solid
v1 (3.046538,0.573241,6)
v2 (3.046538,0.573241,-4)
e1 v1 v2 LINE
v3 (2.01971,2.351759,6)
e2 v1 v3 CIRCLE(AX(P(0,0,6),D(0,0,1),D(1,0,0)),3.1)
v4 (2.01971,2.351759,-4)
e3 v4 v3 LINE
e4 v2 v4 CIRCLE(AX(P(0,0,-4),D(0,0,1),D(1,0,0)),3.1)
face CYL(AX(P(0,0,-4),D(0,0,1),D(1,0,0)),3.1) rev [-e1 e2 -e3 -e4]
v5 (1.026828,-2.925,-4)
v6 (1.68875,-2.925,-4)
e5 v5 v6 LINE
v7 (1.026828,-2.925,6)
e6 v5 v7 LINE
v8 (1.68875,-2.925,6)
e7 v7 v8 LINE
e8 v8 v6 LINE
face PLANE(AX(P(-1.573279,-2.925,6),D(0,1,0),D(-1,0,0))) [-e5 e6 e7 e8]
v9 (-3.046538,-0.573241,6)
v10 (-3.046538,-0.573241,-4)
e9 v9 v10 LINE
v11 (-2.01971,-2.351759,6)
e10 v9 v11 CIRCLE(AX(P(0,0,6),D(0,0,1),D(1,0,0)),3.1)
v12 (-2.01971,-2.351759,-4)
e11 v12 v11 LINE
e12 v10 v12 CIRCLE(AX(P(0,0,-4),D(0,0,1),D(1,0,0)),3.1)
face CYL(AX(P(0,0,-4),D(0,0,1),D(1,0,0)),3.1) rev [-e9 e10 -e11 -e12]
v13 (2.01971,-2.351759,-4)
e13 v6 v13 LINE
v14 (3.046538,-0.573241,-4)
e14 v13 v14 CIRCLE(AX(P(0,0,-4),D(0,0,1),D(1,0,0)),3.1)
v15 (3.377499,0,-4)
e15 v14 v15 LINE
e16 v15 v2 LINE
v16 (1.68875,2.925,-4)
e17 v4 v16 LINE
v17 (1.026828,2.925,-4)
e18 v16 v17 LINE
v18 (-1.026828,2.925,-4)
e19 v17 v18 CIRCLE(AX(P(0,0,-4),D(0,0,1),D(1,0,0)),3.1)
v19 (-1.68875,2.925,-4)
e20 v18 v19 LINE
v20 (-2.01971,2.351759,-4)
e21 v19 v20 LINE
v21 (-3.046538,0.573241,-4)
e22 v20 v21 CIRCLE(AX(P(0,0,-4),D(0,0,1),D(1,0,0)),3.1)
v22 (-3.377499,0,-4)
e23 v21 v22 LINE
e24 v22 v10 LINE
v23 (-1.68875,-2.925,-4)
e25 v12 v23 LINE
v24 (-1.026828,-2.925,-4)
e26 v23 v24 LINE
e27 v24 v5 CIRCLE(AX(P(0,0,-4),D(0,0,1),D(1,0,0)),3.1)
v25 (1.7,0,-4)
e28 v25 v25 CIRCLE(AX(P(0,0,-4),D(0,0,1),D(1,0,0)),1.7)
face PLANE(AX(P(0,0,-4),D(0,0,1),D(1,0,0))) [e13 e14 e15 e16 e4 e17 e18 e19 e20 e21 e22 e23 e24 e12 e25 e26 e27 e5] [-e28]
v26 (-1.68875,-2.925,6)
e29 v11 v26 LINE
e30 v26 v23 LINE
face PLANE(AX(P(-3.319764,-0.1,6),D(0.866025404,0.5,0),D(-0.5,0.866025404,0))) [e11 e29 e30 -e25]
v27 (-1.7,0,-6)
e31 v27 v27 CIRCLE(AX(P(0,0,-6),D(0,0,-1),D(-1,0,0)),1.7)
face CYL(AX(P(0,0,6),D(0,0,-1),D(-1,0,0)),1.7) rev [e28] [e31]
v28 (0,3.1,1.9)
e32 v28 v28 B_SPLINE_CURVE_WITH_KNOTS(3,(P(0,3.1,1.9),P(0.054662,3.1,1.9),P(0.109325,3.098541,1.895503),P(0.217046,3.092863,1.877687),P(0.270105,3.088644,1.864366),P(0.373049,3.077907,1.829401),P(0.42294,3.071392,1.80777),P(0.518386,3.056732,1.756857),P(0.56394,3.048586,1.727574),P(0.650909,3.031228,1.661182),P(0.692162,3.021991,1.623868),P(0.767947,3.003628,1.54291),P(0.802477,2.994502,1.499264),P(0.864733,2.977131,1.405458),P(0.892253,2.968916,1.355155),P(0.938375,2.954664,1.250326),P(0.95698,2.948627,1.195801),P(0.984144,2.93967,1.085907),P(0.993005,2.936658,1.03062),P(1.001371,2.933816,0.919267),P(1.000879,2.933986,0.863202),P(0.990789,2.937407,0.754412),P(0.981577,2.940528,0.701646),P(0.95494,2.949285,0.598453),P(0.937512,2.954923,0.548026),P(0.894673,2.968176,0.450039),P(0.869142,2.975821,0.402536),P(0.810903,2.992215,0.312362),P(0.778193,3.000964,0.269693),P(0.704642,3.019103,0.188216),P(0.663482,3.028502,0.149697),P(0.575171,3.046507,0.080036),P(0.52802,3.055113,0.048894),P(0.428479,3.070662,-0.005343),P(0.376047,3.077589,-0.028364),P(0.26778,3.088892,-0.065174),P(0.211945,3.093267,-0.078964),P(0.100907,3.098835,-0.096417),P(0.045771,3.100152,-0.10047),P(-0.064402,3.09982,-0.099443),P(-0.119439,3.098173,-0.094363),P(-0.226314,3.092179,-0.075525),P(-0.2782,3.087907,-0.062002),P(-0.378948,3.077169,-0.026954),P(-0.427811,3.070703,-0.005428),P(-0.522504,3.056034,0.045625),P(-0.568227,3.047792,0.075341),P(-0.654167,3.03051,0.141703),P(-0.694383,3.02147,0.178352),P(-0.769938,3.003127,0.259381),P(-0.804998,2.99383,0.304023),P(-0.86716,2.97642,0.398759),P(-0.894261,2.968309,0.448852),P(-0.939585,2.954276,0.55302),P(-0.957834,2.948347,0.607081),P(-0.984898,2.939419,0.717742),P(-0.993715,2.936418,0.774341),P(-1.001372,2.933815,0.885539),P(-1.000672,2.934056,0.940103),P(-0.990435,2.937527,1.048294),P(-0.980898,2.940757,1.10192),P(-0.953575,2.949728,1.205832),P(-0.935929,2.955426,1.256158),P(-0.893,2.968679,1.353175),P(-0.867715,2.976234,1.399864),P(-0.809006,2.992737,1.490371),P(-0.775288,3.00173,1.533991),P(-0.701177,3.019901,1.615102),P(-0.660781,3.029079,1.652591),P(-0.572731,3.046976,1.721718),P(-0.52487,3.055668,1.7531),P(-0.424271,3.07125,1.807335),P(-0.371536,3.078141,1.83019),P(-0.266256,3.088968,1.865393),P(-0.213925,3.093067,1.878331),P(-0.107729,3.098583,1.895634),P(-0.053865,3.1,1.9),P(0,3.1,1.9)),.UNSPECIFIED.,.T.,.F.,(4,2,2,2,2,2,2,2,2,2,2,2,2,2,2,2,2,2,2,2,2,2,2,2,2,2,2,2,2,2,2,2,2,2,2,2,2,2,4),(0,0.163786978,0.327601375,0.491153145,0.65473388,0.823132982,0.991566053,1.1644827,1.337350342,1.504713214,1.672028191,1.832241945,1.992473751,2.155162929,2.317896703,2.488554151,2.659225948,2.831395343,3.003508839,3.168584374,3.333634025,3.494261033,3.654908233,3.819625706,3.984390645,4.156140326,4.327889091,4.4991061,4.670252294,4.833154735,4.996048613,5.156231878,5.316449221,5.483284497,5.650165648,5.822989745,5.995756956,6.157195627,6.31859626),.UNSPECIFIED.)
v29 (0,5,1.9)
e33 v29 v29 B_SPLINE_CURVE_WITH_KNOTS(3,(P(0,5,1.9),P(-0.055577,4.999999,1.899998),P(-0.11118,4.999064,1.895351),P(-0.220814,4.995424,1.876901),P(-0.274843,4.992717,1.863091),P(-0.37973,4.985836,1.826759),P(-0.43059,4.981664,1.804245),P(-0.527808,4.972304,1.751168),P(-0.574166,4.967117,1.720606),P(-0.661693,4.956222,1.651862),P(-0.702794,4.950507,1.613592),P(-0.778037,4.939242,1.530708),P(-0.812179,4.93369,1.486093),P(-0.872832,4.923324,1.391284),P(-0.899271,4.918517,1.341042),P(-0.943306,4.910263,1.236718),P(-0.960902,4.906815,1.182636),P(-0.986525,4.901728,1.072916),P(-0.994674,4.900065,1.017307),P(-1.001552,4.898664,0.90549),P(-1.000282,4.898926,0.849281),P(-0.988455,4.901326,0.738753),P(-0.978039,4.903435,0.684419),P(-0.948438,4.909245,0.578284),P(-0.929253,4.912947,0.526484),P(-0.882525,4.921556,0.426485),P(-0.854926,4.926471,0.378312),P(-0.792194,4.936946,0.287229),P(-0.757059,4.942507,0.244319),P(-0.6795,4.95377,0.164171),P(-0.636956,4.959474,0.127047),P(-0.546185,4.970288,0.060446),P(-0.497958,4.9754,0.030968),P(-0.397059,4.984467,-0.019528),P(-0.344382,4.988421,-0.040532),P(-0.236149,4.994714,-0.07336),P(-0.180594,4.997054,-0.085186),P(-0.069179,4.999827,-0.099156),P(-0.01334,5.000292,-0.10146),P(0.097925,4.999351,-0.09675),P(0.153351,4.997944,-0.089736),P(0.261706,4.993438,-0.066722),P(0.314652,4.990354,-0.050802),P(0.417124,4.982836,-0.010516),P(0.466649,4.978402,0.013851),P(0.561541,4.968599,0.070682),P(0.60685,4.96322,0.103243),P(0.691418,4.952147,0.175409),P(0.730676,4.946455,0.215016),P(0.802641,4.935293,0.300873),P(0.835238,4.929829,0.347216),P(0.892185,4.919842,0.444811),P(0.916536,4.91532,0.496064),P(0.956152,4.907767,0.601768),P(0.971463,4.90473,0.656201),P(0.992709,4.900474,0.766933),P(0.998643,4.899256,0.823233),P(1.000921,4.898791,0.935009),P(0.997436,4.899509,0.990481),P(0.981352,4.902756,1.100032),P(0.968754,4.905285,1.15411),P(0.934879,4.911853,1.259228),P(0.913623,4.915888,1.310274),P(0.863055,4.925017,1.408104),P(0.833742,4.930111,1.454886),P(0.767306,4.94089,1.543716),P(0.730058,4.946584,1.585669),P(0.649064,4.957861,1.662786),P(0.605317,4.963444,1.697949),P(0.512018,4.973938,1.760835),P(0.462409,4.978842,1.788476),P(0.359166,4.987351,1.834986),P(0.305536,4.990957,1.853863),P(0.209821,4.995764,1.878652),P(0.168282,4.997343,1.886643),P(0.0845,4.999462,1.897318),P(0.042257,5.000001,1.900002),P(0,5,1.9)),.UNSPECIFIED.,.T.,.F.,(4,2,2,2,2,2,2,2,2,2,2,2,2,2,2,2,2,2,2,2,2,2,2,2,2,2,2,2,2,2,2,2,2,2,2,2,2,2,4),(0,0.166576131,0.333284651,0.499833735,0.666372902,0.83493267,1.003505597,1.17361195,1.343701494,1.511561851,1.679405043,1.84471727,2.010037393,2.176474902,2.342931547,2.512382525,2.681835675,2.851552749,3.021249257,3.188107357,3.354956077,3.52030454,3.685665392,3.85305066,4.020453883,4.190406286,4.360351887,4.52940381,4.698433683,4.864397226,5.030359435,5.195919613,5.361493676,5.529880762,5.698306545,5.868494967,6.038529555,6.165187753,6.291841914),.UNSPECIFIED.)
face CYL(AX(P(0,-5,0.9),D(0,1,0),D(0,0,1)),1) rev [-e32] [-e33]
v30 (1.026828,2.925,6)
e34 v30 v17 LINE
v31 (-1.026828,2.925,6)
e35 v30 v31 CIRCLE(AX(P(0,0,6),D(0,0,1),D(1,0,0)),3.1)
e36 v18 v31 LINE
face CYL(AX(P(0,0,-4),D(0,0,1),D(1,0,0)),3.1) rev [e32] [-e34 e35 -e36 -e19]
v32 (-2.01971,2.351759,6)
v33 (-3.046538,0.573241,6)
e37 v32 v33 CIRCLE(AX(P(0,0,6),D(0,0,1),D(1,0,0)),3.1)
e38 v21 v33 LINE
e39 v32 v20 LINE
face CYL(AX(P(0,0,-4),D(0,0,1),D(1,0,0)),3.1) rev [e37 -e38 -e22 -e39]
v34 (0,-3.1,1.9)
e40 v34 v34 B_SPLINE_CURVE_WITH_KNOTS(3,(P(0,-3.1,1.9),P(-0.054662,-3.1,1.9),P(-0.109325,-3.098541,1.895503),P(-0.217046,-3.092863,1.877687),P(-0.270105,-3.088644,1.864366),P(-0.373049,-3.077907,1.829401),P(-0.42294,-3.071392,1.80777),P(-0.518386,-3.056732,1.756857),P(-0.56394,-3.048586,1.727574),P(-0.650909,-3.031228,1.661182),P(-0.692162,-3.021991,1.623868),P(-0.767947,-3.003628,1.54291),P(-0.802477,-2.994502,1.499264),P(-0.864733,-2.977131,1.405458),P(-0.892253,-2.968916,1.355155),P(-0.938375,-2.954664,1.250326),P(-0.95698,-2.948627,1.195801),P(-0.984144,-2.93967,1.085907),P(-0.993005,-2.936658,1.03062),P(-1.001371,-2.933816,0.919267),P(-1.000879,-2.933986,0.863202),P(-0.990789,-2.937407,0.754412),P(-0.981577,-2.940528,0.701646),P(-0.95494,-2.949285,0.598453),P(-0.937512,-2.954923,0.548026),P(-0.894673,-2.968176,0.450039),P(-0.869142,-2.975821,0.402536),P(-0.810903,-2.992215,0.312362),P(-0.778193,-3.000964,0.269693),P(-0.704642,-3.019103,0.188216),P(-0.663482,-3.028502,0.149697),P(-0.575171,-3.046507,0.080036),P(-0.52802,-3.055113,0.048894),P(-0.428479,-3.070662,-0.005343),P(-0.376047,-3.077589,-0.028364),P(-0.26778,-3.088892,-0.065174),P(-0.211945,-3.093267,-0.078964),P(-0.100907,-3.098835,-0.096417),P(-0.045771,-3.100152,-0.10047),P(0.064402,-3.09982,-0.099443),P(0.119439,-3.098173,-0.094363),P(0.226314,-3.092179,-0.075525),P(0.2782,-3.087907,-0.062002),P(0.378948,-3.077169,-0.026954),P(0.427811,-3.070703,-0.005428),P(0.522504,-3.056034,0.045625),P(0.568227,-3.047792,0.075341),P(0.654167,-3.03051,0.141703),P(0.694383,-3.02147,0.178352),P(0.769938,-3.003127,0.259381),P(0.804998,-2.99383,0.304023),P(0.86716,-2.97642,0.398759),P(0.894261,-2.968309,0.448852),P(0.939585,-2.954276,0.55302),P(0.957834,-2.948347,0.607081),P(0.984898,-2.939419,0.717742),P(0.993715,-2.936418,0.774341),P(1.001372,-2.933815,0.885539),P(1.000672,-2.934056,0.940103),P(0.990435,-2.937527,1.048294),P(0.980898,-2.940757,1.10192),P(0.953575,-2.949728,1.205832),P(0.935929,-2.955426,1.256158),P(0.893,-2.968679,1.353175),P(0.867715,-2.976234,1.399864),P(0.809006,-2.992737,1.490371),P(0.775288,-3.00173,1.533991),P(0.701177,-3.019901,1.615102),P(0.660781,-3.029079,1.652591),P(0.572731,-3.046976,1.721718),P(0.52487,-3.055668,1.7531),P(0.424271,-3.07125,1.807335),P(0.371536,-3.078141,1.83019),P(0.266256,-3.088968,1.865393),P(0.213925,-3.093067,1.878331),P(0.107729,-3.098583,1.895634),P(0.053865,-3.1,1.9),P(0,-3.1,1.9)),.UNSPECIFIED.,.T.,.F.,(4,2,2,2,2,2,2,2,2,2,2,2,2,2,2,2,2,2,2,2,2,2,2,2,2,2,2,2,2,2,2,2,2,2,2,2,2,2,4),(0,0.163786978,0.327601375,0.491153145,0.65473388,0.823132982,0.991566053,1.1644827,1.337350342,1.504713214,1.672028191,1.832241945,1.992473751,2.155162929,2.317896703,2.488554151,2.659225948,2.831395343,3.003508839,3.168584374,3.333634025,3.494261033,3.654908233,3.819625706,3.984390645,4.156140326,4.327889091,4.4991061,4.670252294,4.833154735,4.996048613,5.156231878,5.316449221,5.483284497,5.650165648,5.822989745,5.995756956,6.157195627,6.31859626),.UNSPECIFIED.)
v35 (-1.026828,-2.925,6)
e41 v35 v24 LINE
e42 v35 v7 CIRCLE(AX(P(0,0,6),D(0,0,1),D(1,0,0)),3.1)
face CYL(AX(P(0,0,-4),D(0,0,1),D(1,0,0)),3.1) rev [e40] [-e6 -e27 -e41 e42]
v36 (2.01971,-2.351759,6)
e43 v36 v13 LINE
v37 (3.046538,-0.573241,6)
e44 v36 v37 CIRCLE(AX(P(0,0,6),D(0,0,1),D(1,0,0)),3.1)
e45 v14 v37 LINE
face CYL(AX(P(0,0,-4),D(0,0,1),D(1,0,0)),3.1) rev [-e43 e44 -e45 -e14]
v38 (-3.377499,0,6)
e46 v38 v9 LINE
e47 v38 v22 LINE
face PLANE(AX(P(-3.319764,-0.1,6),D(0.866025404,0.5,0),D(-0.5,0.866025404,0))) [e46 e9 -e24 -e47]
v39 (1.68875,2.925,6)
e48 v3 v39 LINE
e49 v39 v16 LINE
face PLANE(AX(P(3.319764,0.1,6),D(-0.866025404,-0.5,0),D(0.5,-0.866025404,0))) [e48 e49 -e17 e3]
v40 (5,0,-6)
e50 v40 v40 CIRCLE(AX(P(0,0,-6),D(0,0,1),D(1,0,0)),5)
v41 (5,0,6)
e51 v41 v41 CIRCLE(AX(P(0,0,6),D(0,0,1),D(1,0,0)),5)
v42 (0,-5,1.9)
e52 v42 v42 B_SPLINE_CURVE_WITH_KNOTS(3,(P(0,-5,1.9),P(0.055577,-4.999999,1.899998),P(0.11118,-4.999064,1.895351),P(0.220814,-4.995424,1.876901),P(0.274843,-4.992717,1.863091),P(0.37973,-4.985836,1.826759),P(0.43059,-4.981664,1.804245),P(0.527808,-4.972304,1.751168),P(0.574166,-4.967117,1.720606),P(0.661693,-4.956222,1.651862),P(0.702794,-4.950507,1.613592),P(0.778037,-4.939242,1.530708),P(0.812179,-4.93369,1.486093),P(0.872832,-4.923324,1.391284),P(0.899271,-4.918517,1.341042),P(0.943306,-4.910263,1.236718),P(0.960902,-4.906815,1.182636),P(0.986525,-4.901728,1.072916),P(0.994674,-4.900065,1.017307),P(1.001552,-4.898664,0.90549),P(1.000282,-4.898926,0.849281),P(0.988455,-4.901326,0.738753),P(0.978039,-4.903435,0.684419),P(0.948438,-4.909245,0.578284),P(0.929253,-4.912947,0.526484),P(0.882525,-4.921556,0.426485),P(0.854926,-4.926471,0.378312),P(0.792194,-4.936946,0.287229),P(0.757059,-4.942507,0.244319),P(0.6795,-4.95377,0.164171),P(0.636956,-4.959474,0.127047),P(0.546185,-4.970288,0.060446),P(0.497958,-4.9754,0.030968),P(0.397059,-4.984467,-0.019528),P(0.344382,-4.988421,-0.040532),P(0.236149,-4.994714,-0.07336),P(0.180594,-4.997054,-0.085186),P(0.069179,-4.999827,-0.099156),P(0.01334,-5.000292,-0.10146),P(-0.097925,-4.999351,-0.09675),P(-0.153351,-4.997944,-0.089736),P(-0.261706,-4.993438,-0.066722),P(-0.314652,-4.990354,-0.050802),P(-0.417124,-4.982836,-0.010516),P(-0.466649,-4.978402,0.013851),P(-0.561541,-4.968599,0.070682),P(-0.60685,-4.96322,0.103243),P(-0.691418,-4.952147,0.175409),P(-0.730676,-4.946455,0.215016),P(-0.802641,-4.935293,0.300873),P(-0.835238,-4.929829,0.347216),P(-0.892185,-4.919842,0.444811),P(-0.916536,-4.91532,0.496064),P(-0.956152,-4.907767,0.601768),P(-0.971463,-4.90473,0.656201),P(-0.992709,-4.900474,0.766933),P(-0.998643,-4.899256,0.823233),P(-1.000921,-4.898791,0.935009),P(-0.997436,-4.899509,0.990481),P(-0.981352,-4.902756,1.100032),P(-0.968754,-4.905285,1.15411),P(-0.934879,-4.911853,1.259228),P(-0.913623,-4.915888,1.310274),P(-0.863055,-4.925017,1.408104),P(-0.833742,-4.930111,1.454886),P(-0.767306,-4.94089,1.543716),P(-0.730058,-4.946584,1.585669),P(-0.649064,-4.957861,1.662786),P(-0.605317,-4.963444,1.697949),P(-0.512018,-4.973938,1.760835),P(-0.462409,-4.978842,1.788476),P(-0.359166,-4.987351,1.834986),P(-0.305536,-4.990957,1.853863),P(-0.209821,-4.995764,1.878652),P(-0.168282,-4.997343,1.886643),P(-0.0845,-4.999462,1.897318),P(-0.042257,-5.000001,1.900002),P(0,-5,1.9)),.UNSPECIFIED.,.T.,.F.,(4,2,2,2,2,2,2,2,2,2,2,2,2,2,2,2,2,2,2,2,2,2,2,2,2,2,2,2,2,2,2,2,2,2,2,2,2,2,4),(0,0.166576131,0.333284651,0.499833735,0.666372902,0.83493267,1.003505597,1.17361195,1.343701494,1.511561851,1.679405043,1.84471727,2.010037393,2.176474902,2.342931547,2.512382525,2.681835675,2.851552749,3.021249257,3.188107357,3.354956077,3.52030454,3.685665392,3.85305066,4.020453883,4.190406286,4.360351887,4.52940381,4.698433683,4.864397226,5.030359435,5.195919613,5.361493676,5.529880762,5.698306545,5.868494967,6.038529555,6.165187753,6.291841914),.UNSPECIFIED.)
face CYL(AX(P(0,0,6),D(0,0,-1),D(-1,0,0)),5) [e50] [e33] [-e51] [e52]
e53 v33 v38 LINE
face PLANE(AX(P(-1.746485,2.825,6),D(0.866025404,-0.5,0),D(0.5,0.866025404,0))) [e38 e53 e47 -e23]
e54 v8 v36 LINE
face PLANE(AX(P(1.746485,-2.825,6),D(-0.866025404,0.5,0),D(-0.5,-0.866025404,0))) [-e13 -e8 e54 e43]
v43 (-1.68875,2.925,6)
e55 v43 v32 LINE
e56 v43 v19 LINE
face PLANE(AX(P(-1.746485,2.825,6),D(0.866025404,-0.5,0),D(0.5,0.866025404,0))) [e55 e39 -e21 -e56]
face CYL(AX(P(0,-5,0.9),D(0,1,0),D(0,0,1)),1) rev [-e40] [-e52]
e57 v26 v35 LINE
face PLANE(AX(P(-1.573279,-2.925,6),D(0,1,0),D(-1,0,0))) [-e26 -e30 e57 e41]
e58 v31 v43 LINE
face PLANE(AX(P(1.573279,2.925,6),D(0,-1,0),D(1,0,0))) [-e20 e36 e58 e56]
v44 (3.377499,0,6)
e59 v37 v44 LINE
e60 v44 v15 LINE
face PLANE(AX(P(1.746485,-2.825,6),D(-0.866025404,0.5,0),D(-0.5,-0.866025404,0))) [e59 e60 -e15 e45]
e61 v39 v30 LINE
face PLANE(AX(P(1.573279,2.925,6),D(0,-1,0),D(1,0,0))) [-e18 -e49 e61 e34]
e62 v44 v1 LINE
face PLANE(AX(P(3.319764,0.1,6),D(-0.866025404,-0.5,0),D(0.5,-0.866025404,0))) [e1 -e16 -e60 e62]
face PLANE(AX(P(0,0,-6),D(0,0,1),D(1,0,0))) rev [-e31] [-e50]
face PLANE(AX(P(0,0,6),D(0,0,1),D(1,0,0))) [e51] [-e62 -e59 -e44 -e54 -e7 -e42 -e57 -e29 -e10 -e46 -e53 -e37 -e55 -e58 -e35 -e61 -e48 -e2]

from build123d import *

# Parameters (mm, degrees)
SKETCH1_R               = 5
BOSS_EXTRUDE1_DEPTH     = 6
SKETCH2_R               = 3
CUT_EXTRUDE1_DEPTH      = 10
CUT_EXTRUDE2_DEPTH      = 13.247448714
MOVE_START              = -4
MOVE_FACE1_DEPTH        = 10
MOVE_FACE2_DEPTH        = 10
SKETCH4_R               = 1.7
CUT_EXTRUDE3_DEPTH      = 14.928388277
CUT_EXTRUDE7_DEPTH      = 10.273618495
CUT_EXTRUDE7_DEPTH_BACK = 10.273618495
SKETCH10_R              = 1


# Read off the part's stored shape, not the designer's step: Move Face1, Move Face2
with BuildPart() as part:
    # Sketch1 → Boss-Extrude1 (new, symmetric)
    with BuildSketch(Plane.XY):
        Circle(SKETCH1_R)
    extrude(amount=BOSS_EXTRUDE1_DEPTH, both=True)

    # Sketch2 → Cut-Extrude1 (cut)
    with BuildSketch(Plane.XY.offset(6)):
        Circle(SKETCH2_R)
    extrude(amount=-CUT_EXTRUDE1_DEPTH, mode=Mode.SUBTRACT)

    # Sketch3 → Cut-Extrude2 (cut, through all)
    with BuildSketch(Plane.XY.offset(-4)):
        Polygon((1.573279484, 2.725), (-1.573279484, 2.725), (-3.146558967, 0), (-1.573279484, -2.725), (1.573279484, -2.725), (3.146558967, 0), align=None)
    extrude(amount=CUT_EXTRUDE2_DEPTH, mode=Mode.SUBTRACT)

    # Move Face1 outline → Move Face1 (cut)
    with BuildSketch(Plane.XY.offset(MOVE_START)):
        with BuildLine():
            Line((2.866431597, -0.885194838), (3.377499075, 0))
            Line((3.377499075, 0), (2.866431597, 0.885194838))
            ThreePointArc((2.866431597, 0.885194838), (2.942674777, 0.583665277), (2.98728973, 0.275862411))
            Line((2.98728973, 0.275862411), (3.146558967, 0))
            Line((3.146558967, 0), (2.98728973, -0.275862411))
            ThreePointArc((2.98728973, -0.275862411), (2.942674777, -0.583665277), (2.866431597, -0.885194838))
        make_face()
        with BuildLine():
            Line((1.688749537, -2.925), (2.199817015, -2.039805162))
            ThreePointArc((2.199817015, -2.039805162), (1.976806346, -2.256598473), (1.732548721, -2.449137589))
            Line((1.732548721, -2.449137589), (1.573279484, -2.725))
            Line((1.573279484, -2.725), (1.254741009, -2.725))
            ThreePointArc((1.254741009, -2.725), (0.965868431, -2.840263751), (0.666614581, -2.925))
            Line((0.666614581, -2.925), (1.688749537, -2.925))
        make_face()
        with BuildLine():
            ThreePointArc((1.732548721, 2.449137589), (1.976806346, 2.256598473), (2.199817015, 2.039805162))
            Line((2.199817015, 2.039805162), (1.688749537, 2.925))
            Line((1.688749537, 2.925), (0.666614581, 2.925))
            ThreePointArc((0.666614581, 2.925), (0.965868431, 2.840263751), (1.254741009, 2.725))
            Line((1.254741009, 2.725), (1.573279484, 2.725))
            Line((1.573279484, 2.725), (1.732548721, 2.449137589))
        make_face()
        with BuildLine():
            Line((-1.688749537, -2.925), (-0.666614581, -2.925))
            ThreePointArc((-0.666614581, -2.925), (-0.965868431, -2.840263751), (-1.254741009, -2.725))
            Line((-1.254741009, -2.725), (-1.573279484, -2.725))
            Line((-1.573279484, -2.725), (-1.732548721, -2.449137589))
            ThreePointArc((-1.732548721, -2.449137589), (-1.976806346, -2.256598473), (-2.199817015, -2.039805162))
            Line((-2.199817015, -2.039805162), (-1.688749537, -2.925))
        make_face()
        with BuildLine():
            ThreePointArc((-1.254741009, 2.725), (-0.965868431, 2.840263751), (-0.666614581, 2.925))
            Line((-0.666614581, 2.925), (-1.688749537, 2.925))
            Line((-1.688749537, 2.925), (-2.199817015, 2.039805162))
            ThreePointArc((-2.199817015, 2.039805162), (-1.976806346, 2.256598473), (-1.732548721, 2.449137589))
            Line((-1.732548721, 2.449137589), (-1.573279484, 2.725))
            Line((-1.573279484, 2.725), (-1.254741009, 2.725))
        make_face()
        with BuildLine():
            Line((-3.377499075, 0), (-2.866431597, -0.885194838))
            ThreePointArc((-2.866431597, -0.885194838), (-2.942674777, -0.583665277), (-2.98728973, -0.275862411))
            Line((-2.98728973, -0.275862411), (-3.146558967, 0))
            Line((-3.146558967, 0), (-2.98728973, 0.275862411))
            ThreePointArc((-2.98728973, 0.275862411), (-2.942674777, 0.583665277), (-2.866431597, 0.885194838))
            Line((-2.866431597, 0.885194838), (-3.377499075, 0))
        make_face()
    extrude(amount=MOVE_FACE1_DEPTH, mode=Mode.SUBTRACT)

    # Move Face2 outline → Move Face2 (cut)
    with BuildSketch(Plane.XY.offset(MOVE_START)):
        with BuildLine():
            Line((2.866431597, 0.885194838), (3.046538126, 0.573241179))
            ThreePointArc((3.046538126, 0.573241179), (2.684678752, 1.55), (2.019710487, 2.351758821))
            Line((2.019710487, 2.351758821), (2.199817015, 2.039805162))
            ThreePointArc((2.199817015, 2.039805162), (2.598076211, 1.5), (2.866431597, 0.885194838))
        make_face()
        with BuildLine():
            ThreePointArc((2.019710487, -2.351758821), (2.684678752, -1.55), (3.046538126, -0.573241179))
            Line((3.046538126, -0.573241179), (2.866431597, -0.885194838))
            ThreePointArc((2.866431597, -0.885194838), (2.598076211, -1.5), (2.199817015, -2.039805162))
            Line((2.199817015, -2.039805162), (2.019710487, -2.351758821))
        make_face()
        with BuildLine():
            Line((0.666614581, 2.925), (1.026827639, 2.925))
            ThreePointArc((1.026827639, 2.925), (0, 3.1), (-1.026827639, 2.925))
            Line((-1.026827639, 2.925), (-0.666614581, 2.925))
            ThreePointArc((-0.666614581, 2.925), (0, 3), (0.666614581, 2.925))
        make_face()
        with BuildLine():
            ThreePointArc((-1.026827639, -2.925), (0, -3.1), (1.026827639, -2.925))
            Line((1.026827639, -2.925), (0.666614581, -2.925))
            ThreePointArc((0.666614581, -2.925), (0, -3), (-0.666614581, -2.925))
            Line((-0.666614581, -2.925), (-1.026827639, -2.925))
        make_face()
        with BuildLine():
            Line((-2.199817015, 2.039805162), (-2.019710487, 2.351758821))
            ThreePointArc((-2.019710487, 2.351758821), (-2.684678752, 1.55), (-3.046538126, 0.573241179))
            Line((-3.046538126, 0.573241179), (-2.866431597, 0.885194838))
            ThreePointArc((-2.866431597, 0.885194838), (-2.598076211, 1.5), (-2.199817015, 2.039805162))
        make_face()
        with BuildLine():
            ThreePointArc((-3.046538126, -0.573241179), (-2.684678752, -1.55), (-2.019710487, -2.351758821))
            Line((-2.019710487, -2.351758821), (-2.199817015, -2.039805162))
            ThreePointArc((-2.199817015, -2.039805162), (-2.598076211, -1.5), (-2.866431597, -0.885194838))
            Line((-2.866431597, -0.885194838), (-3.046538126, -0.573241179))
        make_face()
    extrude(amount=MOVE_FACE2_DEPTH, mode=Mode.SUBTRACT)

    # Sketch4 → Cut-Extrude3 (cut, through all)
    with BuildSketch(Plane(origin=(0, 0, -6), x_dir=(-1, 0, 0), z_dir=(0, 0, -1))):
        Circle(SKETCH4_R)
    extrude(amount=-CUT_EXTRUDE3_DEPTH, mode=Mode.SUBTRACT)

    # Sketch10 → Cut-Extrude7 (cut, two sides: drawn at the far end of the back side and taken through both)
    with BuildSketch(Plane(origin=(0, 0, 0), x_dir=(1, 0, 0), z_dir=(0, 1, 0)).offset(-CUT_EXTRUDE7_DEPTH_BACK)):
        with Locations(Location((0, -0.9, 0), (0, 0, 270))):
            Circle(SKETCH10_R)
    extrude(amount=CUT_EXTRUDE7_DEPTH + CUT_EXTRUDE7_DEPTH_BACK, mode=Mode.SUBTRACT)


solid = part.part
